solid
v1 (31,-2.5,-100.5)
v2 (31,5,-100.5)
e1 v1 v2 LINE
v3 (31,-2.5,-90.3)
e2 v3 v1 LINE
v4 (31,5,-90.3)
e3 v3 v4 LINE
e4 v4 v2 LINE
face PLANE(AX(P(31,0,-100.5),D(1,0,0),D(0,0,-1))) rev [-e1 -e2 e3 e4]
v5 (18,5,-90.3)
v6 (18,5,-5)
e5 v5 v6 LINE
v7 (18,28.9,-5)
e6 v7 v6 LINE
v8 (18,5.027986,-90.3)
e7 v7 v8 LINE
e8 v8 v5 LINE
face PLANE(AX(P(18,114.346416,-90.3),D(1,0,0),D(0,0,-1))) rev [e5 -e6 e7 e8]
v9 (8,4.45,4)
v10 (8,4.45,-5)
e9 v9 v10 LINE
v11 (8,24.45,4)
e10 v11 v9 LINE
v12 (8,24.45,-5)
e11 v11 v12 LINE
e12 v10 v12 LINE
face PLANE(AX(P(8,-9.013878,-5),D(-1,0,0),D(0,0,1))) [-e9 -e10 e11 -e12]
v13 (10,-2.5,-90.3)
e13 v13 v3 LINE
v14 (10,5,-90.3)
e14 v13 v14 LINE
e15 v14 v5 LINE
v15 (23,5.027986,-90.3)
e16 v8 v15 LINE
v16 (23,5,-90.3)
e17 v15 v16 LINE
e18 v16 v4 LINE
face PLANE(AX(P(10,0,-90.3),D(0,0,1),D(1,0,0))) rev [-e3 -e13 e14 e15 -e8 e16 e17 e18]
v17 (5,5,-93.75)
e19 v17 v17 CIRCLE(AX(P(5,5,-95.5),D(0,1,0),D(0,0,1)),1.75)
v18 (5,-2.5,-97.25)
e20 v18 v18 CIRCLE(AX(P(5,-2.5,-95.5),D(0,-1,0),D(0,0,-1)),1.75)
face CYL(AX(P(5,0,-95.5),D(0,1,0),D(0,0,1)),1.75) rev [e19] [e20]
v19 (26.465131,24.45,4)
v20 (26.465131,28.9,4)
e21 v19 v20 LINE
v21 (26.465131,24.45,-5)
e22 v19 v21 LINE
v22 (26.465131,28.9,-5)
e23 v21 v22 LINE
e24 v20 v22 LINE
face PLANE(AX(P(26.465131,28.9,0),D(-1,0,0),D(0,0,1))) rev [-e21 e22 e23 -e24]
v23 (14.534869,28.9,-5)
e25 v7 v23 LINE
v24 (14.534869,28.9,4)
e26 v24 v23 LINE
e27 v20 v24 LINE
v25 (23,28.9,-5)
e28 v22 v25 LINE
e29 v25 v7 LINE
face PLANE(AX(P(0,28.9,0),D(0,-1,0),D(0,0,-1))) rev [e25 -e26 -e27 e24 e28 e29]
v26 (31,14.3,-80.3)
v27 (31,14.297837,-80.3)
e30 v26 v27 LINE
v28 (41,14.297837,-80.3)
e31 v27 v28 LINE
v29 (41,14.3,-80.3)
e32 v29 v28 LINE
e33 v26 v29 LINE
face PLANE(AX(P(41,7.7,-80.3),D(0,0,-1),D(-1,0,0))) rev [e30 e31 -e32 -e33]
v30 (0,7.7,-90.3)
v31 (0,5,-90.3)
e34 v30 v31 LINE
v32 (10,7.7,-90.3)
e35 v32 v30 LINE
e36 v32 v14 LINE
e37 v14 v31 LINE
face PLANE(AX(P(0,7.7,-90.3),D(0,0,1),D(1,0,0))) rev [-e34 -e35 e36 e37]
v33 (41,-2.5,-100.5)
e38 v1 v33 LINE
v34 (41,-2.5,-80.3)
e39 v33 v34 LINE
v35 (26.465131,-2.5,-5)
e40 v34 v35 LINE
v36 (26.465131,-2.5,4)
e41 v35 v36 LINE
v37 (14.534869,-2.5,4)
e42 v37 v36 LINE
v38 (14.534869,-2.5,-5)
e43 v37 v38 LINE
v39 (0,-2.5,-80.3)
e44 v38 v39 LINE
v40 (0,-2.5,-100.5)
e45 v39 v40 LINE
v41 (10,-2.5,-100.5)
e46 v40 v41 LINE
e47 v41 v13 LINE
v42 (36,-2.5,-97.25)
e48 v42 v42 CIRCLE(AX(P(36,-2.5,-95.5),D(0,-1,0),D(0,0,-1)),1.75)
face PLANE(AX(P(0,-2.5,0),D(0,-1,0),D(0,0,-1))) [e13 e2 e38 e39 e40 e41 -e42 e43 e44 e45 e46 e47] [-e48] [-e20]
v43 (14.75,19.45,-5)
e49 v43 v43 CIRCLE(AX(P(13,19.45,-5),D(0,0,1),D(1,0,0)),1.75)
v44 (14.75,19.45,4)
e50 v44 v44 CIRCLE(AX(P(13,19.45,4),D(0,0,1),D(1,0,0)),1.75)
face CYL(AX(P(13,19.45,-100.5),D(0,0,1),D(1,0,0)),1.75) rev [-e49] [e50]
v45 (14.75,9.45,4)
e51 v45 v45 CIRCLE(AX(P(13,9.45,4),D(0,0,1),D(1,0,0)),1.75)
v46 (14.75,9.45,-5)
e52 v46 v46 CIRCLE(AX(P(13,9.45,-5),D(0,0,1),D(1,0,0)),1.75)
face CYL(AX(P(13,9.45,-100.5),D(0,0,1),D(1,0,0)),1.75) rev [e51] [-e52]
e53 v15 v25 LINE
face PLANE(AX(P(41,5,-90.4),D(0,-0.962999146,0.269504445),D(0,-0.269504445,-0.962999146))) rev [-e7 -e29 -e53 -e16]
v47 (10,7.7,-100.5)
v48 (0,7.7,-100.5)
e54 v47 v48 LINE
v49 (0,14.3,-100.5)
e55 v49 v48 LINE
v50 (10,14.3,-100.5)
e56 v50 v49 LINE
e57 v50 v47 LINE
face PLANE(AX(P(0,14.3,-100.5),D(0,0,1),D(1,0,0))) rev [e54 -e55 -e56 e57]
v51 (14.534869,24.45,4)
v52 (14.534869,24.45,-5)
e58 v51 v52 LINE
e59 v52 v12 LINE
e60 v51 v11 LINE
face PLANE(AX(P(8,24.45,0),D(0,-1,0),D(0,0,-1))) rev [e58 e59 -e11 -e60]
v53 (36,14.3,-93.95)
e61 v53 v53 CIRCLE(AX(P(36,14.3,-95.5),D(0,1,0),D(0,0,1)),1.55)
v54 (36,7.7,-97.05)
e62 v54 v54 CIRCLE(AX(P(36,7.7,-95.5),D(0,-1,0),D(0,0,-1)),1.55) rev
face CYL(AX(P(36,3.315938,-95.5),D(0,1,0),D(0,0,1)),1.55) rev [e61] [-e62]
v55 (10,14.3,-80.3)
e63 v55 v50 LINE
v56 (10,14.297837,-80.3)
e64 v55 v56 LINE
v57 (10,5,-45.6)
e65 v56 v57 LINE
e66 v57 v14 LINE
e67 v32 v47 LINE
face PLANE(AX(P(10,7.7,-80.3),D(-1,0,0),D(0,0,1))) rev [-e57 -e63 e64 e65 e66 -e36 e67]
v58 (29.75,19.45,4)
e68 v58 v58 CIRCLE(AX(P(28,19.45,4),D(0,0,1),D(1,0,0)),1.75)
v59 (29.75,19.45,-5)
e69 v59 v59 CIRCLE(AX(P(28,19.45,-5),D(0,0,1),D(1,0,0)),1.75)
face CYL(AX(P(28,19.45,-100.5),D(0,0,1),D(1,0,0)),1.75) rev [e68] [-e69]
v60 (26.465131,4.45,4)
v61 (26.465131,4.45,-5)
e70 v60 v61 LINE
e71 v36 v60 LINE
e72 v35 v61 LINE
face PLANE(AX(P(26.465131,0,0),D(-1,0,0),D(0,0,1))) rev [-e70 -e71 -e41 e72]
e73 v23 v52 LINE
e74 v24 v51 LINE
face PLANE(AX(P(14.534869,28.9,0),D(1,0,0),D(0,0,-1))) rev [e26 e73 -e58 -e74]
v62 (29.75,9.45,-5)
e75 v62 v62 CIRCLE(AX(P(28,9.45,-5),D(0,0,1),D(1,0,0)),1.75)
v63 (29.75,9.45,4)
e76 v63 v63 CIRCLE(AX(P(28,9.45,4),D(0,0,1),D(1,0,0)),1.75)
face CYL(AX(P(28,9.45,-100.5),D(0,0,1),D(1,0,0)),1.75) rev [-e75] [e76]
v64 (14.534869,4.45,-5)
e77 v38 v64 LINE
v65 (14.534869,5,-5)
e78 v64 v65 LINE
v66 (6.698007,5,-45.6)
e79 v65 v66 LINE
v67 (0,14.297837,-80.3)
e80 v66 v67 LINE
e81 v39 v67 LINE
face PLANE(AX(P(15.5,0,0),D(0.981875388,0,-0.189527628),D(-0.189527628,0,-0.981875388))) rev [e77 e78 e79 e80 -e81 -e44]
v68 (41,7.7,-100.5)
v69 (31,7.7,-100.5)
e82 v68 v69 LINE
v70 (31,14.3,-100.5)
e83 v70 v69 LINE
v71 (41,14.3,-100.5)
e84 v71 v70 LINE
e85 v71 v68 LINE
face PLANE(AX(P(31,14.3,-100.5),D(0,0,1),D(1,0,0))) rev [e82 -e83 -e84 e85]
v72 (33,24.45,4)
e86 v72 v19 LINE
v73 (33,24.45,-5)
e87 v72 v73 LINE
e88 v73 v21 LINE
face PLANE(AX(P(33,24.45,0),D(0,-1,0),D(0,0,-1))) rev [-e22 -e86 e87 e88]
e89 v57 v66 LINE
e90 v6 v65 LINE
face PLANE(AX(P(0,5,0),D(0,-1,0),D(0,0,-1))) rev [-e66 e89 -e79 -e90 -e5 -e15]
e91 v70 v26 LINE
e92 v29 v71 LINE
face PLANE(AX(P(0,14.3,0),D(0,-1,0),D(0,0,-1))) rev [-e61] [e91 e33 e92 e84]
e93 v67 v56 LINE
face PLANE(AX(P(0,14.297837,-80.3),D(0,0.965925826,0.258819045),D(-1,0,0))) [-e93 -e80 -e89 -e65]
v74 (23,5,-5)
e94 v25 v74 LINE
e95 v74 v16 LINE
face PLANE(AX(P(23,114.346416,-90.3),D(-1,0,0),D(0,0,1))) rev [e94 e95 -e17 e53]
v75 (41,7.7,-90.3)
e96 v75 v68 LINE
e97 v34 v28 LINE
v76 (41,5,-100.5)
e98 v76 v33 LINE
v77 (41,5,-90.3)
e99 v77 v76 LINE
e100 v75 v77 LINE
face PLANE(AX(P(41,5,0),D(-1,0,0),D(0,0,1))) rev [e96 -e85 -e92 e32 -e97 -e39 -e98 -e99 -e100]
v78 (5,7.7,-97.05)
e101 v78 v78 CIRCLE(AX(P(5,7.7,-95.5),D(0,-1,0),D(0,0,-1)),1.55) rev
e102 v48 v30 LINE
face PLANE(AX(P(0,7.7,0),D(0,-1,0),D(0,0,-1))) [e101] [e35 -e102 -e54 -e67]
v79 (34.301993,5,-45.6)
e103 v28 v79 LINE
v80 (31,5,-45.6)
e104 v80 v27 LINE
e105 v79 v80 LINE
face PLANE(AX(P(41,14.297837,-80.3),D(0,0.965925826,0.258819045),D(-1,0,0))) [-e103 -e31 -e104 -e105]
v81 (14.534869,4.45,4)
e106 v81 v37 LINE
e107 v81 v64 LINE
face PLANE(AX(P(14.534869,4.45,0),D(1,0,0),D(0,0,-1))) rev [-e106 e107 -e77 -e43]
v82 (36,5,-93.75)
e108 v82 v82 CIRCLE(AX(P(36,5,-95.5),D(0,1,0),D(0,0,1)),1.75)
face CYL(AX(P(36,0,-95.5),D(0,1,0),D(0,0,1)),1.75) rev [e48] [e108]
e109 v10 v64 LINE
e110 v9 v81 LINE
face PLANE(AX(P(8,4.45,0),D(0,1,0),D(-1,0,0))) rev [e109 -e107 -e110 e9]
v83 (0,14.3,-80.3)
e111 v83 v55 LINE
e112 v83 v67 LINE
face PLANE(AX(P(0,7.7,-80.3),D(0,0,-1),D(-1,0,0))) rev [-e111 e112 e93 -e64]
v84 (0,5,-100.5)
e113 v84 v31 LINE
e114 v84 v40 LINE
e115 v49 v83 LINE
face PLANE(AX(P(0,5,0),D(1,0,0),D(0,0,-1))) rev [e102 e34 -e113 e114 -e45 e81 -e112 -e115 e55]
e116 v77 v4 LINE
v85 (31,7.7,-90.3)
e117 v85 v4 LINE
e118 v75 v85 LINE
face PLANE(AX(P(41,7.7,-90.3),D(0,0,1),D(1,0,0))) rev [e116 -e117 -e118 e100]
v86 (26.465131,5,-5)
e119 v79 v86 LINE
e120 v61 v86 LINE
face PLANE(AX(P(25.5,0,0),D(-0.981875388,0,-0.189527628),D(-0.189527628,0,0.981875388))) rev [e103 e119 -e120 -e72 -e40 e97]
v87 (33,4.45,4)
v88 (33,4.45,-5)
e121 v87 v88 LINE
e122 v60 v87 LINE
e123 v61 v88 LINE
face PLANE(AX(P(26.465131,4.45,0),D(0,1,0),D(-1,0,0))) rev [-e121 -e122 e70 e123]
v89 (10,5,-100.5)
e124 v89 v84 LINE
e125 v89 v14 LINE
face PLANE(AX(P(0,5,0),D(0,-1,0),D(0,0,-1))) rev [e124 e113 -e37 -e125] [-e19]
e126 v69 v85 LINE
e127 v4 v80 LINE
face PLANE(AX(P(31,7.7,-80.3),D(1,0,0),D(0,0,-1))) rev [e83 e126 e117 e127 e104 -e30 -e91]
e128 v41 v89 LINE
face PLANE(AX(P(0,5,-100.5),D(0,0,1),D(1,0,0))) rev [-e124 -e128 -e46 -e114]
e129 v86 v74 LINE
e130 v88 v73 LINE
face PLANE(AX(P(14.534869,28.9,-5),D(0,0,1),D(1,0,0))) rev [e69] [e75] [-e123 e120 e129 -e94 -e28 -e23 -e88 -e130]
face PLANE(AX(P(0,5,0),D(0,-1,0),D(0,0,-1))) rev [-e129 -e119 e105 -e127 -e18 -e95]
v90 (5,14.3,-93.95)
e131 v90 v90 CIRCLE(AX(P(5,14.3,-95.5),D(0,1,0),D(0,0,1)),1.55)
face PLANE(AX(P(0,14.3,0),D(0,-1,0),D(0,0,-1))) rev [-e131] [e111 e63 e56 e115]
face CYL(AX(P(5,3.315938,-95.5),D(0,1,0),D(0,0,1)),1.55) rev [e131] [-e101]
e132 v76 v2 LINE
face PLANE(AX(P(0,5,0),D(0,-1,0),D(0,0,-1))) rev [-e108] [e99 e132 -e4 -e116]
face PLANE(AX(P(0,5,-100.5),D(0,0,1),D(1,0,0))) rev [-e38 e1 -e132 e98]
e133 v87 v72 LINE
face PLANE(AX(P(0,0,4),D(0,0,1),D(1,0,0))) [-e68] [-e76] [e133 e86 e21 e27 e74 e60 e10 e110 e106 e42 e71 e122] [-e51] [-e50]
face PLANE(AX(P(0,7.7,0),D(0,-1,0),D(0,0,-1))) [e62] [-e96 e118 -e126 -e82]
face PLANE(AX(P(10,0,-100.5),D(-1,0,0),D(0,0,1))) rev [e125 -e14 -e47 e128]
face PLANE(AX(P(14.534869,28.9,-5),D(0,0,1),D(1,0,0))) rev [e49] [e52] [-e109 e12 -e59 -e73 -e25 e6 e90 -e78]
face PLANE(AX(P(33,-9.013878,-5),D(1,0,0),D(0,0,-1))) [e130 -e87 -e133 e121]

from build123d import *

# Parameters (mm, degrees)
SKETCH1_W            = 41
SKETCH1_H            = 100.5
BOSS_EXTRUDE1_DEPTH  = 5
SKETCH2_W            = 21
SKETCH2_H            = 10.2
CUT_EXTRUDE1_DEPTH   = 109.656569061
SKETCH9_R            = 1.75
CUT_EXTRUDE4_DEPTH   = 109.656569061
CUT_EXTRUDE5_DEPTH   = 109.656569061
BOSS_EXTRUDE4_DEPTH  = 23.9
SKETCH16_W           = 5
SKETCH16_H           = 85.3
BOSS_EXTRUDE5_DEPTH  = 23.9
CUT_EXTRUDE8_DEPTH   = 108.072218619
BOSS_EXTRUDE6_DEPTH  = 28.9
SKETCH25_W           = 6.53486924
SKETCH25_H           = 4.45
CUT_EXTRUDE9_DEPTH   = 108.872424651
SKETCH26_R           = 1.75
CUT_EXTRUDE10_DEPTH  = 113.323016341
SKETCH27_R           = 1.75
BOSS_EXTRUDE7_DEPTH  = 2.5
BOSS_EXTRUDE8_START  = 4
SKETCH28_R           = 1.75
BOSS_EXTRUDE8_DEPTH  = 4
SKETCH29_W           = 10
SKETCH29_H           = 10
BOSS_EXTRUDE9_DEPTH  = 2.7
SKETCH30_W           = 10
SKETCH30_H           = 20.2
BOSS_EXTRUDE10_DEPTH = 6.6
SKETCH31_R           = 1.55
CUT_EXTRUDE11_DEPTH  = 6.6
CHAMFER2_SIZE        = 34.7
CHAMFER2_SIZE_2      = 9.297836977


with BuildPart() as part:
    # Sketch1 → Boss-Extrude1 (new body)
    with BuildSketch(Plane(origin=(0, 0, 0), x_dir=(1, 0, 0), z_dir=(0, 1, 0))):
        with Locations((20.5, 50.25)):
            Rectangle(SKETCH1_W, SKETCH1_H)
    extrude(amount=BOSS_EXTRUDE1_DEPTH)

    # Sketch2 → Cut-Extrude1 (cut, through all)
    with BuildSketch(Plane(origin=(0, 5, 0), x_dir=(1, 0, 0), z_dir=(0, 1, 0))):
        with Locations((20.5, 95.4)):
            Rectangle(SKETCH2_W, SKETCH2_H)
    extrude(amount=-CUT_EXTRUDE1_DEPTH, mode=Mode.SUBTRACT)

    # Sketch9 → Cut-Extrude4 (cut, through all)
    with BuildSketch(Plane(origin=(0, 5, 0), x_dir=(1, 0, 0), z_dir=(0, 1, 0))):
        with Locations(Location((5, 95.5, 0), (0, 0, 270))):
            Circle(SKETCH9_R)
        with Locations(Location((36, 95.5, 0), (0, 0, 270))):
            Circle(SKETCH9_R)
    extrude(amount=-CUT_EXTRUDE4_DEPTH, mode=Mode.SUBTRACT)

    # Sketch11 → Cut-Extrude5 (cut, through all)
    with BuildSketch(Plane(origin=(0, 5, 0), x_dir=(1, 0, 0), z_dir=(0, 1, 0))):
        Polygon((15.5, 0), (0, 80.3), (0, 0), align=None)
        Polygon((25.5, 0), (41, 80.3), (41, 0), align=None)
    extrude(amount=-CUT_EXTRUDE5_DEPTH, mode=Mode.SUBTRACT)

    # Sketch12 → Boss-Extrude4 (add)
    with BuildSketch(Plane(origin=(0, 5, 0), x_dir=(1, 0, 0), z_dir=(0, 1, 0))):
        Polygon((25.5, 0), (15.5, 0), (14.53486924, 5), (26.46513076, 5), align=None)
    extrude(amount=BOSS_EXTRUDE4_DEPTH)

    # Sketch16 → Boss-Extrude5 (add)
    with BuildSketch(Plane(origin=(0, 5, 0), x_dir=(1, 0, 0), z_dir=(0, 1, 0))):
        with Locations((20.5, 47.65)):
            Rectangle(SKETCH16_W, SKETCH16_H)
    extrude(amount=BOSS_EXTRUDE5_DEPTH)

    # Sketch17 → Cut-Extrude8 (cut, through all)
    with BuildSketch(Plane.ZY.offset(-18)):
        Polygon((-90.4, 5), (-5, 28.9), (-90.3, 28.9), align=None)
    extrude(amount=-CUT_EXTRUDE8_DEPTH, mode=Mode.SUBTRACT)

    # Sketch23 → Boss-Extrude6 (add)
    with BuildSketch(Plane(origin=(0, 28.9, 0), x_dir=(1, 0, 0), z_dir=(0, 1, 0))):
        Polygon((26.46513076, 5), (33, 5), (33, 0), (25.5, 0), align=None)
        Polygon((14.53486924, 5), (8, 5), (8, 0), (15.5, 0), align=None)
    extrude(amount=-BOSS_EXTRUDE6_DEPTH)

    # Sketch25 → Cut-Extrude9 (cut, through all)
    with BuildSketch(Plane(origin=(0, 0, -5), x_dir=(-1, 0, 0), z_dir=(0, 0, -1))):
        with Locations((-11.26743462, 2.225)):
            Rectangle(SKETCH25_W, SKETCH25_H)
        with Locations((-29.73256538, 2.225)):
            Rectangle(SKETCH25_W, SKETCH25_H)
        with Locations((-11.26743462, 26.675)):
            Rectangle(SKETCH25_W, SKETCH25_H)
        with Locations((-29.73256538, 26.675)):
            Rectangle(SKETCH25_W, SKETCH25_H)
    extrude(amount=-CUT_EXTRUDE9_DEPTH, mode=Mode.SUBTRACT)

    # Sketch26 → Cut-Extrude10 (cut, through all)
    with BuildSketch(Plane.XY):
        with Locations((13, 19.45)):
            Circle(SKETCH26_R)
        with Locations((28, 19.45)):
            Circle(SKETCH26_R)
        with Locations((13, 9.45)):
            Circle(SKETCH26_R)
        with Locations((28, 9.45)):
            Circle(SKETCH26_R)
    extrude(amount=-CUT_EXTRUDE10_DEPTH, mode=Mode.SUBTRACT)

    # Sketch27 → Boss-Extrude7 (add)
    with BuildSketch(Plane.XZ):
        Polygon((26.46513076, -5), (26.46513076, 0), (14.53486924, 0), (14.53486924, -5), (0, -80.3), (0, -100.5), (10, -100.5), (10, -90.3), (31, -90.3), (31, -100.5), (41, -100.5), (41, -80.3), align=None)
        with Locations(Location((5, -95.5, 0), (0, 0, 90))):
            Circle(SKETCH27_R, mode=Mode.SUBTRACT)
        with Locations(Location((36, -95.5, 0), (0, 0, 90))):
            Circle(SKETCH27_R, mode=Mode.SUBTRACT)
    extrude(amount=BOSS_EXTRUDE7_DEPTH)

    # Sketch28 → Boss-Extrude8 (add)
    with BuildSketch(Plane.XY.offset(BOSS_EXTRUDE8_START)):
        Polygon((26.46513076, -2.5), (26.46513076, 4.45), (33, 4.45), (33, 24.45), (26.46513076, 24.45), (26.46513076, 28.9), (14.53486924, 28.9), (14.53486924, 24.45), (8, 24.45), (8, 4.45), (14.53486924, 4.45), (14.53486924, -2.5), align=None)
        with Locations((28, 9.45)):
            Circle(SKETCH28_R, mode=Mode.SUBTRACT)
        with Locations((13, 9.45)):
            Circle(SKETCH28_R, mode=Mode.SUBTRACT)
        with Locations((28, 19.45)):
            Circle(SKETCH28_R, mode=Mode.SUBTRACT)
        with Locations((13, 19.45)):
            Circle(SKETCH28_R, mode=Mode.SUBTRACT)
    extrude(amount=-BOSS_EXTRUDE8_DEPTH)

    # Sketch29 → Boss-Extrude9 (add)
    with BuildSketch(Plane(origin=(0, 5, 0), x_dir=(1, 0, 0), z_dir=(0, 1, 0))):
        with Locations((36, 85.3)):
            Rectangle(SKETCH29_W, SKETCH29_H)
        with Locations((5, 85.3)):
            Rectangle(SKETCH29_W, SKETCH29_H)
    extrude(amount=BOSS_EXTRUDE9_DEPTH)

    # Sketch30 → Boss-Extrude10 (add)
    with BuildSketch(Plane(origin=(0, 7.7, 0), x_dir=(1, 0, 0), z_dir=(0, 1, 0))):
        with Locations((5, 90.4)):
            Rectangle(SKETCH30_W, SKETCH30_H)
        with Locations((36, 90.4)):
            Rectangle(SKETCH30_W, SKETCH30_H)
    extrude(amount=BOSS_EXTRUDE10_DEPTH)

    # Sketch31 → Cut-Extrude11 (cut)
    with BuildSketch(Plane(origin=(0, 14.3, 0), x_dir=(1, 0, 0), z_dir=(0, 1, 0))):
        with Locations(Location((36, 95.5, 0), (0, 0, 270))):
            Circle(SKETCH31_R)
        with Locations(Location((5, 95.5, 0), (0, 0, 270))):
            Circle(SKETCH31_R)
    extrude(amount=-CUT_EXTRUDE11_DEPTH, mode=Mode.SUBTRACT)

    # Chamfer2
    # the kernel refuses this chamfer: 34.7, 9.297836977 mm, written as the material it adds along each edge
    with BuildSketch(Plane(origin=(41, 5, -80.3), x_dir=(0, -0.009967146577156432, 0.9999503267608395), z_dir=(-1, 0, 0))) as chamfer2_piece_1_section:
        Polygon((CHAMFER2_SIZE * 0.999950326761, CHAMFER2_SIZE * 0.00996714657716), (-CHAMFER2_SIZE_2 * 0.00996714657754, CHAMFER2_SIZE_2 * 0.9999503268), (0, 0), align=None)
    chamfer2_piece_1 = extrude(amount=10, mode=Mode.PRIVATE)
    chamfer2_piece_1 = split(chamfer2_piece_1, bisect_by=Plane(origin=(38.932419972, 8.049756371, -69.588601533), z_dir=(-0.9818753883596208, 0, -0.1895276278900885)), keep=Keep.TOP, mode=Mode.PRIVATE)
    add(chamfer2_piece_1)
    with BuildSketch(Plane(origin=(41, 5, -80.3), x_dir=(0, -0.009967146577156432, 0.9999503267608395), z_dir=(-1, 0, 0))) as chamfer2_piece_2_section:
        Polygon((CHAMFER2_SIZE * 0.999950326761, CHAMFER2_SIZE * 0.00996714657716), (-CHAMFER2_SIZE_2 * 0.00996714657754, CHAMFER2_SIZE_2 * 0.9999503268), (0, 0), align=None)
    chamfer2_piece_2 = extrude(amount=100.106238486, mode=Mode.PRIVATE)
    chamfer2_piece_2 = split(chamfer2_piece_2, bisect_by=Plane(origin=(2.067580028, 8.049756371, -69.588601533), z_dir=(0.9818753883596207, 0, -0.18952762789008884)), keep=Keep.TOP, mode=Mode.PRIVATE)
    chamfer2_piece_2 = split(chamfer2_piece_2, bisect_by=Plane(origin=(0, 8.049756371, -70.340774245), z_dir=(1, 0, 0)), keep=Keep.TOP, mode=Mode.PRIVATE)
    chamfer2_piece_2 = split(chamfer2_piece_2, bisect_by=Plane(origin=(10, 8.049756371, -70.340774245), z_dir=(-1, 0, 0)), keep=Keep.TOP, mode=Mode.PRIVATE)
    add(chamfer2_piece_2)
    with BuildSketch(Plane(origin=(0, 5, -80.3), x_dir=(0, -0.009967146577156432, 0.9999503267608395), z_dir=(1, 0, 0))) as chamfer2_piece_3_section:
        Polygon((CHAMFER2_SIZE * 0.999950326761, -CHAMFER2_SIZE * 0.00996714657716), (-CHAMFER2_SIZE_2 * 0.00996714657754, -CHAMFER2_SIZE_2 * 0.9999503268), (0, 0), align=None)
    chamfer2_piece_3 = extrude(amount=10, mode=Mode.PRIVATE)
    chamfer2_piece_3 = split(chamfer2_piece_3, bisect_by=Plane(origin=(2.067580028, 8.049756371, -69.588601533), z_dir=(0.9818753883596207, 0, -0.18952762789008884)), keep=Keep.TOP, mode=Mode.PRIVATE)
    add(chamfer2_piece_3)
    with BuildSketch(Plane(origin=(0, 5, -80.3), x_dir=(0, -0.009967146577156432, 0.9999503267608395), z_dir=(1, 0, 0))) as chamfer2_piece_4_section:
        Polygon((CHAMFER2_SIZE * 0.999950326761, -CHAMFER2_SIZE * 0.00996714657716), (-CHAMFER2_SIZE_2 * 0.00996714657754, -CHAMFER2_SIZE_2 * 0.9999503268), (0, 0), align=None)
    chamfer2_piece_4 = extrude(amount=100.106238486, mode=Mode.PRIVATE)
    chamfer2_piece_4 = split(chamfer2_piece_4, bisect_by=Plane(origin=(38.932419972, 8.049756371, -69.588601533), z_dir=(-0.9818753883596208, 0, -0.1895276278900885)), keep=Keep.TOP, mode=Mode.PRIVATE)
    chamfer2_piece_4 = split(chamfer2_piece_4, bisect_by=Plane(origin=(31, 8.049756371, -70.340774245), z_dir=(1, 0, 0)), keep=Keep.TOP, mode=Mode.PRIVATE)
    chamfer2_piece_4 = split(chamfer2_piece_4, bisect_by=Plane(origin=(41, 8.049756371, -70.340774245), z_dir=(-1, 0, 0)), keep=Keep.TOP, mode=Mode.PRIVATE)
    add(chamfer2_piece_4)


solid = part.part
